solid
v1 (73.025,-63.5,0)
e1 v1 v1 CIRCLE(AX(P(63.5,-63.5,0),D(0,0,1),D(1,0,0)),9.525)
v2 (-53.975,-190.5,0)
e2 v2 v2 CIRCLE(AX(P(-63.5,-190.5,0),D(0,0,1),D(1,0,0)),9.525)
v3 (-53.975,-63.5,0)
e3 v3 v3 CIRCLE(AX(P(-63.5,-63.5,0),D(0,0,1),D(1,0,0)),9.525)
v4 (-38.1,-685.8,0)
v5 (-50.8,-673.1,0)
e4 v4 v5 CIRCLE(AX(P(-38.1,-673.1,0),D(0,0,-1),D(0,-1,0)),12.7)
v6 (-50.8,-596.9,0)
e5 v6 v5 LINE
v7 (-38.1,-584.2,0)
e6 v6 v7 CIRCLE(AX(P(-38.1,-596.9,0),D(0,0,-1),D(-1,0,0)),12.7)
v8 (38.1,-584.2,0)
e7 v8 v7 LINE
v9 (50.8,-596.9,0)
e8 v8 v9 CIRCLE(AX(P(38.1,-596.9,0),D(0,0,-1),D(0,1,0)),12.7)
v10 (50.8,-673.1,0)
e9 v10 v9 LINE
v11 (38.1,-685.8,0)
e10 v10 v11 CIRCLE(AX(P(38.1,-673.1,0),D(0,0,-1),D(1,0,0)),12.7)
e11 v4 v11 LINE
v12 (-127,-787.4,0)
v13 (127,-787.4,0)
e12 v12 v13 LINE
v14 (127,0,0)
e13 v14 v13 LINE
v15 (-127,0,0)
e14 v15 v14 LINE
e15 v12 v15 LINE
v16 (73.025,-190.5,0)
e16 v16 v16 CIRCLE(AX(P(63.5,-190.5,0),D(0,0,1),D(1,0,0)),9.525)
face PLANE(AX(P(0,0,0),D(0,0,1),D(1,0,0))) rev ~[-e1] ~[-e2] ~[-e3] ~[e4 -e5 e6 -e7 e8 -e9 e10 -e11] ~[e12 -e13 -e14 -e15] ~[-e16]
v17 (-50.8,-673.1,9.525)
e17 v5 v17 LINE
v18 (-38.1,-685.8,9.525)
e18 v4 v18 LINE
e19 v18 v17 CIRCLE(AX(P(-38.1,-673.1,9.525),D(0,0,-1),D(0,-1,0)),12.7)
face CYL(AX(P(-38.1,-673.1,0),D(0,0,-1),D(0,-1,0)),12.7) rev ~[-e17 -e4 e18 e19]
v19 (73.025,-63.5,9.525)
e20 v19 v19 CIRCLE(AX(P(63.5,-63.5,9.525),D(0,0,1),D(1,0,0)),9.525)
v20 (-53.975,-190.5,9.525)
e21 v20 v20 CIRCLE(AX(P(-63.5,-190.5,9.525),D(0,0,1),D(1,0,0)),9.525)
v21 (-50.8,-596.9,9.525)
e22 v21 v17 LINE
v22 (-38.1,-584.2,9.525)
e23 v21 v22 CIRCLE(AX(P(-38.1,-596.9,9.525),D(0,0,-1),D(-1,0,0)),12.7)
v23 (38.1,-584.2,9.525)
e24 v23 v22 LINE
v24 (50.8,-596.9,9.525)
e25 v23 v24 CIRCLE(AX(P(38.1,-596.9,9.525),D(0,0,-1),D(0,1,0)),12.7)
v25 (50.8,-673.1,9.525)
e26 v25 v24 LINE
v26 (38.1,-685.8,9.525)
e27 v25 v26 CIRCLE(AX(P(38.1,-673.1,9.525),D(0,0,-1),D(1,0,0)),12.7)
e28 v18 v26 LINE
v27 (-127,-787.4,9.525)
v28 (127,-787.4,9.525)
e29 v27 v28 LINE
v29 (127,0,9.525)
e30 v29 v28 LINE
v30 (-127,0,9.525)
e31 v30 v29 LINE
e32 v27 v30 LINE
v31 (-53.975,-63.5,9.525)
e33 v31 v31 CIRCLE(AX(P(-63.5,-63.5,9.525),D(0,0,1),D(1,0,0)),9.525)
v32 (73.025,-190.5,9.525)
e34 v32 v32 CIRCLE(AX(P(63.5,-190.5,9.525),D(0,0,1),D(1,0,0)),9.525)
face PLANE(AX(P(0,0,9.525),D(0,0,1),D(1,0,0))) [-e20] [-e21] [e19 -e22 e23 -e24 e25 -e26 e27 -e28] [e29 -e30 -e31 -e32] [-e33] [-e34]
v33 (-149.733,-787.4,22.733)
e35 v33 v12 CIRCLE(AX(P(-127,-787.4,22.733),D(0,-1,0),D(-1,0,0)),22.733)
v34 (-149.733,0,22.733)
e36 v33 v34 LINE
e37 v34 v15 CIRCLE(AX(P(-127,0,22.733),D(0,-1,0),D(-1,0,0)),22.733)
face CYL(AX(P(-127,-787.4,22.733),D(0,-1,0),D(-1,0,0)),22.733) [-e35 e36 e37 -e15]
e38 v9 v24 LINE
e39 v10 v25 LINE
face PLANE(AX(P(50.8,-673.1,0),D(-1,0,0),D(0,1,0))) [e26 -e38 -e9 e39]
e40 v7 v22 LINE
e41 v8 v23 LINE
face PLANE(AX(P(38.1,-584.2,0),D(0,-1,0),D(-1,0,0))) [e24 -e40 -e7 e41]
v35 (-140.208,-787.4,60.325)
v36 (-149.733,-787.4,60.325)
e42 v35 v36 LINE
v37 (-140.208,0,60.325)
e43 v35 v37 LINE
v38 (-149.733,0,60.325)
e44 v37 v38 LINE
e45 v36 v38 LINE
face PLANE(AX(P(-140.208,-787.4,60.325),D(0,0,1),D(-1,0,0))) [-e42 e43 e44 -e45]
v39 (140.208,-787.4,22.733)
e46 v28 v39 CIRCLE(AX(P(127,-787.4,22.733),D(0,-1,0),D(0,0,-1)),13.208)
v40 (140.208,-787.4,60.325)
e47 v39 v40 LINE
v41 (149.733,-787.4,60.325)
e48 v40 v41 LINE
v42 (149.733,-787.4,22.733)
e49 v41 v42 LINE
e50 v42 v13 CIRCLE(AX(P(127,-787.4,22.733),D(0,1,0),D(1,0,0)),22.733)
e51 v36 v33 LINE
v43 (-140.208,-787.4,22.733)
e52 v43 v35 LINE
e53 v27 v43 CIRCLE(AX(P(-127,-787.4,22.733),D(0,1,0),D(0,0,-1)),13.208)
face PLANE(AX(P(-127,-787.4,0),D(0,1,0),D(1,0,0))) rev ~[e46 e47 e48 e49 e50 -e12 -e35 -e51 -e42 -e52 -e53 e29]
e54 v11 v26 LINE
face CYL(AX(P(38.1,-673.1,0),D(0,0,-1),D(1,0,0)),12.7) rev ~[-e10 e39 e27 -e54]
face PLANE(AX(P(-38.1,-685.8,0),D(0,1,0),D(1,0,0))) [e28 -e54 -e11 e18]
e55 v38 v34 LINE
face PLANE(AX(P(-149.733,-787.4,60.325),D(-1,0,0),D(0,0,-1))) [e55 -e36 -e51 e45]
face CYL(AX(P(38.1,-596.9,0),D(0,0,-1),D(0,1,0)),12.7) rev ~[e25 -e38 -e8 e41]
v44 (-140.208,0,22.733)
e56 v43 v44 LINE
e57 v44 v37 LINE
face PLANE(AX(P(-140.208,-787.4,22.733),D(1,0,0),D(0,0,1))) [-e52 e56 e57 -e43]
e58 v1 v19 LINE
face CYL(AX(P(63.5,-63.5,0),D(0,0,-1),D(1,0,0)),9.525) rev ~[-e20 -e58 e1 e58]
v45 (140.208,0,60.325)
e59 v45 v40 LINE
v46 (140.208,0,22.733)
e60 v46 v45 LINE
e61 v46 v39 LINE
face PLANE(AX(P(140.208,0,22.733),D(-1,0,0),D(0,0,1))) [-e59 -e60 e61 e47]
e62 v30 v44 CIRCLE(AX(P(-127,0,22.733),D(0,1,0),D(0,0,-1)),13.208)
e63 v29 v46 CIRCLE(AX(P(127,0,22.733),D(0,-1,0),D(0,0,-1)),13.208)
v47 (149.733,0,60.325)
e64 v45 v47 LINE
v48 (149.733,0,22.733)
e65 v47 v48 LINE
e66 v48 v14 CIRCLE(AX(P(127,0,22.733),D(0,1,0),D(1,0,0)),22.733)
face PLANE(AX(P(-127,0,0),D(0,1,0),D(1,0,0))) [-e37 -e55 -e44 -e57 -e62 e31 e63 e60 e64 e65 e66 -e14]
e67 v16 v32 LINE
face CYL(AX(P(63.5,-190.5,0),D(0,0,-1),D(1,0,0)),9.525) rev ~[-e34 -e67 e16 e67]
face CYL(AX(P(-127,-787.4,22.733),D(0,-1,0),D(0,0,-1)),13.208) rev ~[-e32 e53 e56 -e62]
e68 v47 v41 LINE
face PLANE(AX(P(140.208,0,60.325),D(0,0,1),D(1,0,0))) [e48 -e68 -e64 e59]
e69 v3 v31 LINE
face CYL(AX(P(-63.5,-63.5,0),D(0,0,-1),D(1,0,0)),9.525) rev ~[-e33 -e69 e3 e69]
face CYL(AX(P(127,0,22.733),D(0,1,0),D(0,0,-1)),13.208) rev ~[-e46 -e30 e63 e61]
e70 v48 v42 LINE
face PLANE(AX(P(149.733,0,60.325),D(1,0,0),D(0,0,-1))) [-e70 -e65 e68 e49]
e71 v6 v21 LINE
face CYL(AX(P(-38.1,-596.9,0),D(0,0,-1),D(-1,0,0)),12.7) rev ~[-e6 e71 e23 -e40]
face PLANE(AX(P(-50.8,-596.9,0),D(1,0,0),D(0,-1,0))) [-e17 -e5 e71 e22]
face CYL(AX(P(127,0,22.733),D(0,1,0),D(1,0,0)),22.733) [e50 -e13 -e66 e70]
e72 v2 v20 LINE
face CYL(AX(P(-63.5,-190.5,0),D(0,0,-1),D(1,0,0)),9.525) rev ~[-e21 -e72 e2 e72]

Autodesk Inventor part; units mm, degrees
ref_plane "YZ Plane" through (0, 0, 0) normal (1, 0, 0) x (0, 1, 0)
ref_plane "XZ Plane" through (0, 0, 0) normal (0, 1, 0) x (-1, 0, 0)
ref_plane "XY Plane" through (0, 0, 0) normal (0, 0, 1) x (1, 0, 0)
sketch "Sketch1" plane through (0, 0, 0) normal (0, 0, 1) x (1, 0, 0)
  line L0 (-127, 0) -> (127, 0)
  line L1 (-127, -787.4) -> (-127, 0)
  line L2 (127, 0) -> (127, -787.4)
  line L3 (-63.5, -190.5) -> (63.5, -190.5) construction
  line L4 (63.5, -190.5) -> (63.5, -63.5) construction
  line L5 (63.5, -63.5) -> (-63.5, -63.5) construction
  line L6 (-63.5, -63.5) -> (-63.5, -190.5) construction
  line L7 (-63.5, -190.5) -> (63.5, -63.5) construction
  line L8 (63.5, -190.5) -> (-63.5, -63.5) construction
  circle A0 centre (-63.5, -63.5) radius 9.525
  circle A1 centre (63.5, -63.5) radius 9.525
  circle A2 centre (63.5, -190.5) radius 9.525
  circle A3 centre (-63.5, -190.5) radius 9.525
  line L9 (-127, -787.4) -> (127, -787.4)
  point P0 (0, 0)
  point P1 (0, 0)
  point P2 (0, -127)
  point P3 (0, -63.5)
  dimension "d1" = 254
  dimension "d7" = 19.05
  dimension "d8" = 127
  dimension "d9" = 127
  dimension "d10" = 63.5
extrude "Plate1" add sketch "Sketch1" along normal blind 9.525
sketch "Sketch3" plane through (-140.208, -787.4, 22.733) normal (-1, 0, 0) x (0, -1, 0)
  line L0 (-787.4, 0) -> (0, 0)
  line L1 (0, 0) -> (0, 37.592)
  line L2 (0, 37.592) -> (-787.4, 37.592)
  line L3 (-787.4, 37.592) -> (-787.4, 0)
edge flange "Flange2" height 50.8 angle 90 thickness 9.525 bend radius 13.208 thickness toward (-1, 0, 0) relief tear relief width 9.525 relief depth 4.7625 corner gap 9.525 corner form 0 edges at (-127, -393.7, 9.525) (127, -393.7, 9.525) wall of the first edge with corners at (-140.208, 0, 22.733) (-140.208, -787.4, 22.733) (-140.208, -787.4, 60.325) (-140.208, 0, 60.325)
bend "Bend2"
corner "Corner2"
sketch "Sketch4" plane through (0, 0, 0) normal (0, 0, -1) x (-1, 0, 0)
  line L0 (-38.1, -584.2) -> (38.1, -584.2)
  line L1 (50.8, -596.9) -> (50.8, -673.1)
  line L2 (38.1, -685.8) -> (-38.1, -685.8)
  line L3 (-50.8, -673.1) -> (-50.8, -596.9)
  line L4 (-50.8, -584.2) -> (50.8, -685.8) construction
  line L5 (50.8, -584.2) -> (-50.8, -685.8) construction
  line L6 (127, -787.4) -> (-127, -787.4) projected
  line L7 (-127, 0) -> (127, 0) projected
  arc A0 (-38.1, -584.2) -> (-50.8, -596.9) centre (-38.1, -596.9) ccw
  arc A1 (50.8, -596.9) -> (38.1, -584.2) centre (38.1, -596.9) ccw
  arc A2 (38.1, -685.8) -> (50.8, -673.1) centre (38.1, -673.1) ccw
  arc A3 (-50.8, -673.1) -> (-38.1, -685.8) centre (-38.1, -673.1) ccw
  point P0 (0, 0)
  point P1 (0, -635)
  point P2 (0, 0)
  dimension "d40" = 101.6
  dimension "d41" = 101.6
  dimension "d42" = 101.6
  dimension "d43" = 12.7
extrude "Cut1" cut sketch "Sketch4" against normal blind 9.525
equation "\"d44\" = Thickness"
equation "\"d15\" = Thickness"
equation "\"d30\" = BendReliefWidth"
equation "\"d31\" = BendReliefDepth"
equation "\"d32\" = MinimumRemnant"
equation "\"d33\" = TransitionRadius"
equation "\"d36\" = BendRadius"
equation "\"d37\" = CornerReliefSize"
equation "\"d38\" = GapSize"
equation "\"d39\" = JacobiRadiusSize"
equation "\"BendReliefWidth\" = Thickness"
equation "\"BendReliefDepth\" = 0.5 * Thickness"
equation "\"CornerReliefSize\" = 4 * Thickness"
equation "\"MinimumRemnant\" = 2 * Thickness"
equation "\"TransitionRadius\" = BendRadius"
equation "\"JacobiRadiusSize\" = Thickness"
equation "\"GapSize\" = Thickness"
equation "\"Thickness\" = 9.525"
equation "\"BendRadius\" = 13.208"
properties part number "Model-5_Sheet-LH" material "SS304"
